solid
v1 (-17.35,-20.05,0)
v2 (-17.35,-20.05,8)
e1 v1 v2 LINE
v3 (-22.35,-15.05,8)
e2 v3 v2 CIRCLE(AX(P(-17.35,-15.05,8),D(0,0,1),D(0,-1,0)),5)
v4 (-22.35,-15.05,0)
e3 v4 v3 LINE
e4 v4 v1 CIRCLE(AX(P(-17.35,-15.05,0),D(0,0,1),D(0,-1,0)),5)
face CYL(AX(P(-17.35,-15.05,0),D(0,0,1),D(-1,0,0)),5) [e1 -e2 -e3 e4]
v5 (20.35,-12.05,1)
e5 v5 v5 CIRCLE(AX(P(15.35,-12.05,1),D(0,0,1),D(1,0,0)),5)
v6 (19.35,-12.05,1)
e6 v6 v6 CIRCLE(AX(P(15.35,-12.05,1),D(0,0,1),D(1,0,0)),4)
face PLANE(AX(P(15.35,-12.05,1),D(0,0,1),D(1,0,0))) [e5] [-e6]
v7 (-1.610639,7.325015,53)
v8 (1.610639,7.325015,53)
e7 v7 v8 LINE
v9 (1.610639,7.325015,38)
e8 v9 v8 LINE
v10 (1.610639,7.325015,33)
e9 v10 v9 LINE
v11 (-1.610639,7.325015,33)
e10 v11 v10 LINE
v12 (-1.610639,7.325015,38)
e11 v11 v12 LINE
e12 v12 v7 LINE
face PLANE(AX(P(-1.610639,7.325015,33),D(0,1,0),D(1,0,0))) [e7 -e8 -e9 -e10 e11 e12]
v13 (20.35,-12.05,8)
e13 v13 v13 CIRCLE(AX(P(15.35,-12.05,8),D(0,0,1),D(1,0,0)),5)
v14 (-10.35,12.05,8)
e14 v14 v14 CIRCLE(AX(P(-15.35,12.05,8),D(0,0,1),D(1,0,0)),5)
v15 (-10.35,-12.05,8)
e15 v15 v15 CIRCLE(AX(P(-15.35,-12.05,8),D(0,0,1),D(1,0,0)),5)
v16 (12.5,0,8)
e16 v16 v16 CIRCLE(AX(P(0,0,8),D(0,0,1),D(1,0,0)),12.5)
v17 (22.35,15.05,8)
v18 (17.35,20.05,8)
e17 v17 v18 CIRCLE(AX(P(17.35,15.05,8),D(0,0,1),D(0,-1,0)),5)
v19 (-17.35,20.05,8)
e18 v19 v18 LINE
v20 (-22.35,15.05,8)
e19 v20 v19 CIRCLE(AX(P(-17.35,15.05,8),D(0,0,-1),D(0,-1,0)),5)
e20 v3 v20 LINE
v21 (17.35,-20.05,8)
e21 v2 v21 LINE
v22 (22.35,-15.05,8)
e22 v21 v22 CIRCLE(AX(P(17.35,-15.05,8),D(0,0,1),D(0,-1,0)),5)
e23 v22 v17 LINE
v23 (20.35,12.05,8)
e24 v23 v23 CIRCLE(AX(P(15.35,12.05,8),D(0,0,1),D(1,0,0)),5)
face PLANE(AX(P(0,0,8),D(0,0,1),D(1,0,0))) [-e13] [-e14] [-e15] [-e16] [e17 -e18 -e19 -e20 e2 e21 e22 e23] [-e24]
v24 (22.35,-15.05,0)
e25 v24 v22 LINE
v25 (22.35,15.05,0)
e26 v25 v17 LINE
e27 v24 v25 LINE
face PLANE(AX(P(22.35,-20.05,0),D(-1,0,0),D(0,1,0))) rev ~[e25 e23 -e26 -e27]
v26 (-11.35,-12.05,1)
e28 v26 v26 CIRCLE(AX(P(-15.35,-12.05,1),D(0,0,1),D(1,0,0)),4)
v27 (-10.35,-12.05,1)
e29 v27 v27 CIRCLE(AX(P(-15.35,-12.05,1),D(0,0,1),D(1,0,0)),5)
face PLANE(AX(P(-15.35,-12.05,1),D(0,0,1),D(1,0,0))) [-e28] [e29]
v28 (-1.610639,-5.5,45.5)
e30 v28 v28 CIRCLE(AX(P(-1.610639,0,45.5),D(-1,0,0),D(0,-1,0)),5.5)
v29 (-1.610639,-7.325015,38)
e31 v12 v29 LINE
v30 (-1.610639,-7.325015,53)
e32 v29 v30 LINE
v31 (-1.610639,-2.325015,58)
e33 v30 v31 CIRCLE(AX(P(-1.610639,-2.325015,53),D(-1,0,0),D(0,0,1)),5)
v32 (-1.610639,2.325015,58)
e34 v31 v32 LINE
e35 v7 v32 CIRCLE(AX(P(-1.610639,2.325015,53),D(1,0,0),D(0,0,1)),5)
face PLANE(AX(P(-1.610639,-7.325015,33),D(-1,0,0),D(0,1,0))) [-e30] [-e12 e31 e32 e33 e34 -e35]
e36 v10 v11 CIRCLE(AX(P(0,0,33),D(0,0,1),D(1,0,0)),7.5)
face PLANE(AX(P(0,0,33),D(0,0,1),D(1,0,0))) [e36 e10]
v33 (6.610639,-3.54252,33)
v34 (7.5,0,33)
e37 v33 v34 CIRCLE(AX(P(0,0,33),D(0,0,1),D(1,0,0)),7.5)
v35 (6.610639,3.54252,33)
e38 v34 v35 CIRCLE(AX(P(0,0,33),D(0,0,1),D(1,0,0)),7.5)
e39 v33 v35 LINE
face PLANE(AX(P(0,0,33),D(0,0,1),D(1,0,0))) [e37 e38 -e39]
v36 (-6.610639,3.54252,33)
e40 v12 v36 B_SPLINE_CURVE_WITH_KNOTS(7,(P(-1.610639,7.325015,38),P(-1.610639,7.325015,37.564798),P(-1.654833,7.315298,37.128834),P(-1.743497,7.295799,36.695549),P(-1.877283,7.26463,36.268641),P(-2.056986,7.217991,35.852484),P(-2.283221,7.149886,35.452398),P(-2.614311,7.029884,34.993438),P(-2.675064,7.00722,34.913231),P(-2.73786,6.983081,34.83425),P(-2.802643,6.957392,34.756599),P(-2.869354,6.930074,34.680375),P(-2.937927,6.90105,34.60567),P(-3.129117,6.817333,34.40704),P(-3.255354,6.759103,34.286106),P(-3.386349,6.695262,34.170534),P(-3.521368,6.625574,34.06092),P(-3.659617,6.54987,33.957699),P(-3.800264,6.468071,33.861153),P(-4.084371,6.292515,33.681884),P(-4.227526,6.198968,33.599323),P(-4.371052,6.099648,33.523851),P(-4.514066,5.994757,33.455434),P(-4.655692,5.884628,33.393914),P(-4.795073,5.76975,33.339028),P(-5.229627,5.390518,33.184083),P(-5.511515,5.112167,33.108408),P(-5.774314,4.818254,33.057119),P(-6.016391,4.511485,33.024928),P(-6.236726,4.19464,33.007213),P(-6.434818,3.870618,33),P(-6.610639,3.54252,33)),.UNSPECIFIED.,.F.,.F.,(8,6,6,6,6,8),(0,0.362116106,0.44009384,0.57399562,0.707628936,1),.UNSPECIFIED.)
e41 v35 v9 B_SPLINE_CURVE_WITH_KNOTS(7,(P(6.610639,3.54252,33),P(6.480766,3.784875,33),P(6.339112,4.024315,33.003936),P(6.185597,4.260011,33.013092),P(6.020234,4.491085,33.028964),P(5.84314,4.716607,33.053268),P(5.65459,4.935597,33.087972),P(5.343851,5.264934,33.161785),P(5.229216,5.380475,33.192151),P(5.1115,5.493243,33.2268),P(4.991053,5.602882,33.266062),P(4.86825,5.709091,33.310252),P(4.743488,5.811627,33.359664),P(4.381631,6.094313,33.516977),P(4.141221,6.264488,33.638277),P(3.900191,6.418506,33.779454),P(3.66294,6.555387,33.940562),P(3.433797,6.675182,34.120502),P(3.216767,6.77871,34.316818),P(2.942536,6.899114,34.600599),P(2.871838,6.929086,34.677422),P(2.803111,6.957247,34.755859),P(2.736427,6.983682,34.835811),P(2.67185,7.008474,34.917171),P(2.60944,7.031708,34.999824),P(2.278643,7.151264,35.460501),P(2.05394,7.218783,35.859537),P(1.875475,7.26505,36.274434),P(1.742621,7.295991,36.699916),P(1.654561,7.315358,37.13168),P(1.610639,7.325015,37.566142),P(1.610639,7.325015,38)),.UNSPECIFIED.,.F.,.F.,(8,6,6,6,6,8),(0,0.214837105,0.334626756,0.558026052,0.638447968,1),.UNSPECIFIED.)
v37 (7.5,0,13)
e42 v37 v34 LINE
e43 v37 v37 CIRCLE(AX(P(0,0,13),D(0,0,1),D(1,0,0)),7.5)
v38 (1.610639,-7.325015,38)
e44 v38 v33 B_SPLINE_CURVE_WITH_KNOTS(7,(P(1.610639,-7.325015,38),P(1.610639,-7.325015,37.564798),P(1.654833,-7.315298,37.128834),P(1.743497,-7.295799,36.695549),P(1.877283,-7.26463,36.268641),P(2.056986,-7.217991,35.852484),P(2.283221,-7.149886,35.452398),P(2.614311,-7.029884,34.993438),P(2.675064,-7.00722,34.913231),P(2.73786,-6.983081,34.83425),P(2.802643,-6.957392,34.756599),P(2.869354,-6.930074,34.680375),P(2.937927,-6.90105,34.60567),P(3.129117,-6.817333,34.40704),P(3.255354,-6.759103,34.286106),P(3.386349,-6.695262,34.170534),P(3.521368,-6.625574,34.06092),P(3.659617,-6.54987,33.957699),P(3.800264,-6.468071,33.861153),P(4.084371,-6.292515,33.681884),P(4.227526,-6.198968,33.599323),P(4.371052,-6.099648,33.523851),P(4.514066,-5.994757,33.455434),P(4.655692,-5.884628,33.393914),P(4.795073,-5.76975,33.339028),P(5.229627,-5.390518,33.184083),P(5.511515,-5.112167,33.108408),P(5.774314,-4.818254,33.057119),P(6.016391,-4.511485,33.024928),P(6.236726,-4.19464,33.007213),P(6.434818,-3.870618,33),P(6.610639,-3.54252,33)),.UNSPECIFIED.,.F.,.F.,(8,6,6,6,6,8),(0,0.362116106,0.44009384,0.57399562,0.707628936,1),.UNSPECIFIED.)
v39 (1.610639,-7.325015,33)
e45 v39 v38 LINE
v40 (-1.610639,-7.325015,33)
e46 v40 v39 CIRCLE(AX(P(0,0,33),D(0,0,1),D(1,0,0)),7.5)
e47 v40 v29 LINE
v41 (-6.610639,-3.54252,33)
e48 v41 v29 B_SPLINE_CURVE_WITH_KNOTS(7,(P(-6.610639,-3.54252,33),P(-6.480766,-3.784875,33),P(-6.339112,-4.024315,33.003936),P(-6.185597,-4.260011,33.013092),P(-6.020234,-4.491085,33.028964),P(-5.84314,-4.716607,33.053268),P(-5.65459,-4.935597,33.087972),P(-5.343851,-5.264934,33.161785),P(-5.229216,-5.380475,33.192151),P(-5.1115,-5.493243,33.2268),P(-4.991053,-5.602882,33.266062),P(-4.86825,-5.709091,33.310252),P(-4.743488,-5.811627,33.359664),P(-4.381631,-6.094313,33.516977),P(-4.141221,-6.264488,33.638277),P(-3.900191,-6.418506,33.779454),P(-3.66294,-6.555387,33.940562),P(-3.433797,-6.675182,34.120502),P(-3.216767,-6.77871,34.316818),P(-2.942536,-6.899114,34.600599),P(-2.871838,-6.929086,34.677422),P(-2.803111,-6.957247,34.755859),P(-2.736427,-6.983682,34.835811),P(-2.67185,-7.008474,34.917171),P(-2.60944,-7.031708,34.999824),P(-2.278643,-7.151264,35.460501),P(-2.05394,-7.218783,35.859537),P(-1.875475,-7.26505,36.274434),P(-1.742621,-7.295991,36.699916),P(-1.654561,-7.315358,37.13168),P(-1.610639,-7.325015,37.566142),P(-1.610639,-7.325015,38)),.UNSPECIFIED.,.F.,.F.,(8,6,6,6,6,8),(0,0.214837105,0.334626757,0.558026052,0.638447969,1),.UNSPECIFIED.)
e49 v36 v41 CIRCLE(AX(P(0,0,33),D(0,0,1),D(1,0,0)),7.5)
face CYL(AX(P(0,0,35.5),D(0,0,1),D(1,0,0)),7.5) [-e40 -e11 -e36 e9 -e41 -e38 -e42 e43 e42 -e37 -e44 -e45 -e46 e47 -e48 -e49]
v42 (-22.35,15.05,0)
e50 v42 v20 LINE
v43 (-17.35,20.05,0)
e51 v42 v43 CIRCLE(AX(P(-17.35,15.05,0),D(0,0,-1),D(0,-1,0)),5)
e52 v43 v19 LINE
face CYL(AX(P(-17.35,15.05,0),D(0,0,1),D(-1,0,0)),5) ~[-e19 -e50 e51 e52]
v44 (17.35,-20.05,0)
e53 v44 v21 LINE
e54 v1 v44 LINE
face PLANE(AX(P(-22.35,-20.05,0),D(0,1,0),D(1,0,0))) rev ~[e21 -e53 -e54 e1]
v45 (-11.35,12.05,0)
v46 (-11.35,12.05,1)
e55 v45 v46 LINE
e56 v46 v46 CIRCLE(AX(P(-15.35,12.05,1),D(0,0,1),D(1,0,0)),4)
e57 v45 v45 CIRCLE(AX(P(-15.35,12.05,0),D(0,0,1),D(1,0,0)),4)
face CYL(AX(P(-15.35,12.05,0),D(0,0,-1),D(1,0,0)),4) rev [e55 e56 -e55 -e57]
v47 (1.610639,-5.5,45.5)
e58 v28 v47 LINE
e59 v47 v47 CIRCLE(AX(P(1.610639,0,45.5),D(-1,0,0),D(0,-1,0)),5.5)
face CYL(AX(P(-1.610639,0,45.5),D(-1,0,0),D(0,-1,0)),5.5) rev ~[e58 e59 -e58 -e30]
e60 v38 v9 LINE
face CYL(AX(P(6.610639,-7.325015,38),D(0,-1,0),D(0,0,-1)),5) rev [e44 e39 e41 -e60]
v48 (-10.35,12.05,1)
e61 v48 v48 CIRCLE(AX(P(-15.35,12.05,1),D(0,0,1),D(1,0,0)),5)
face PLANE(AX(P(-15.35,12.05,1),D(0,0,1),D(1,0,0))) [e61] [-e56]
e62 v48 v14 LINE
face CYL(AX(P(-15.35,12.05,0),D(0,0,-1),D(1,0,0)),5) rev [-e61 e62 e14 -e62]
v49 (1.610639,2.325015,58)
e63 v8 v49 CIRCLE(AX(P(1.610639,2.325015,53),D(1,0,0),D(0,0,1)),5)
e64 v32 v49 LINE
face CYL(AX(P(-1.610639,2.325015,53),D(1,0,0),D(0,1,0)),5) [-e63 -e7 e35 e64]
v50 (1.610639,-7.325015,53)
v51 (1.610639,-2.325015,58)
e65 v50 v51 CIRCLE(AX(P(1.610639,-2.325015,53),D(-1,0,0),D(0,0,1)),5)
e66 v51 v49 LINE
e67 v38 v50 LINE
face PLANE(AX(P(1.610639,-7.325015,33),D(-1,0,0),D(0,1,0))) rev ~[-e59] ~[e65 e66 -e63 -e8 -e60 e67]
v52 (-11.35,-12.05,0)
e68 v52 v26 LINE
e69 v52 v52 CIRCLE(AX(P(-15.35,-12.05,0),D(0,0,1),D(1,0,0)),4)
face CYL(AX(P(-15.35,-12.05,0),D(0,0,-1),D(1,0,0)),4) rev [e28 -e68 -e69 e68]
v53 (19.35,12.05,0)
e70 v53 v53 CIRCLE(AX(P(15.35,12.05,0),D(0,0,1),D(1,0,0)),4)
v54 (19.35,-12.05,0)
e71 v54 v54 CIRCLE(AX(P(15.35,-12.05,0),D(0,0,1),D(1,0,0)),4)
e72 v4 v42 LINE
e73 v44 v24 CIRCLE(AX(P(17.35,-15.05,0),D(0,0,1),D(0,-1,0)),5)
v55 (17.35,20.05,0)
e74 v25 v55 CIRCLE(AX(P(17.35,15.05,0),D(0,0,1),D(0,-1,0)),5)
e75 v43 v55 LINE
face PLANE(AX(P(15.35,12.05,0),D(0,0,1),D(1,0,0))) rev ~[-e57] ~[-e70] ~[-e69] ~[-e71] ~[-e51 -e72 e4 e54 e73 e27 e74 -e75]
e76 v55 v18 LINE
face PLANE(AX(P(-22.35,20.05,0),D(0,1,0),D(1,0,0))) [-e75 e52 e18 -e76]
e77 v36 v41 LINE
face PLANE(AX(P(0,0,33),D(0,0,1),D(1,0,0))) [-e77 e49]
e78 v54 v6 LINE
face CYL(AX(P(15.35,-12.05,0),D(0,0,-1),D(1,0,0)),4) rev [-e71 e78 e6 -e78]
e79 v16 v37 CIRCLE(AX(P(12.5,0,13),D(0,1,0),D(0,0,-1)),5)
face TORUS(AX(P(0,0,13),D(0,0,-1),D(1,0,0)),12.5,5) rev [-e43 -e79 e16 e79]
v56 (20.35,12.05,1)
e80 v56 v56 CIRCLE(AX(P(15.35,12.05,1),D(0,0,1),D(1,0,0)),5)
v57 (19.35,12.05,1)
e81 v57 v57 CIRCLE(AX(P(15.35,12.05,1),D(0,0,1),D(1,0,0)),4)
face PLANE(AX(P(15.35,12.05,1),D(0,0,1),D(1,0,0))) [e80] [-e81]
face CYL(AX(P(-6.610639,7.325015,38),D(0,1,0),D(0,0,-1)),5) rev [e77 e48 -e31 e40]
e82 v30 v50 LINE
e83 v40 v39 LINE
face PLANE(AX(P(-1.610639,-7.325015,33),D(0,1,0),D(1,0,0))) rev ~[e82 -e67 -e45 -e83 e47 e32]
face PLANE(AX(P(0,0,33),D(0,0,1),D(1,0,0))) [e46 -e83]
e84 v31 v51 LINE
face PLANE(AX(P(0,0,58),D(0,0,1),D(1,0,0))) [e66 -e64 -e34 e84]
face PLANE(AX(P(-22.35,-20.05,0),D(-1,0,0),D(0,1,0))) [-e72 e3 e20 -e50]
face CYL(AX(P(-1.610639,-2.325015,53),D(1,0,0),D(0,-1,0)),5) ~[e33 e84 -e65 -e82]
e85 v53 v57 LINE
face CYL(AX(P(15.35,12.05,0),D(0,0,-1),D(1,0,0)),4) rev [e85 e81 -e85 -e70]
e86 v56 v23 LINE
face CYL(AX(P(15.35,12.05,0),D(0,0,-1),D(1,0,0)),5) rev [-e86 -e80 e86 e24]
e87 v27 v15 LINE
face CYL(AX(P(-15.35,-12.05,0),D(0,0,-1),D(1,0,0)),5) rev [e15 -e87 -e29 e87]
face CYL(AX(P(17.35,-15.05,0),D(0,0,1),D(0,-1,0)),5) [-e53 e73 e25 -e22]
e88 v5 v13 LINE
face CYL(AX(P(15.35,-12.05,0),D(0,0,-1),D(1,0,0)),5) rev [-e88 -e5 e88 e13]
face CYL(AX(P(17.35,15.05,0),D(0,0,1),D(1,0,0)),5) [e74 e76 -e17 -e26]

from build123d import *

# Parameters (mm, degrees)
F0_W          = 44.7
F0_H          = 40.1
F0_R          = 5
F1_DEPTH      = 8
F0_R_2        = 4
F2_DEPTH      = 1
F3_R          = 7.5
F4_DEPTH      = 25
F5_W          = 3.2212789527
F5_H          = 14.6500294167
F6_DEPTH      = 25
F7_R          = 5.5
F8_DEPTH      = 10
F9_R          = 5
F10_T4_DEPTH  = 14.6500294167
F10_S5_R      = 7.5
F10_T6_DEPTH  = 10
F10_T10_DEPTH = 14.6500294167
F10_S11_R     = 7.5
F10_T12_DEPTH = 10


# Not quite as in the source:
# - a fillet or chamfer that OpenCascade refuses, or shapes differently, is made with other operations: its cross-section is extruded or revolved along the edge and cut away or added


with BuildPart() as f1:
    # F0 (on Top) → F1 (new body)
    with BuildSketch(Plane.XY):
        Rectangle(F0_W, F0_H)
        with Locations((-15.35, -12.05)):
            Circle(F0_R, mode=Mode.SUBTRACT)
        with Locations((15.35, -12.05)):
            Circle(F0_R, mode=Mode.SUBTRACT)
        with Locations((-15.35, 12.05)):
            Circle(F0_R, mode=Mode.SUBTRACT)
        with Locations((15.35, 12.05)):
            Circle(F0_R, mode=Mode.SUBTRACT)
    extrude(amount=F1_DEPTH)

    # F0 (on Top) → F2 (join)
    with BuildSketch(Plane.XY):
        with Locations((15.35, 12.05)):
            Circle(F0_R)
        with Locations((15.35, 12.05)):
            Circle(F0_R_2, mode=Mode.SUBTRACT)
        with Locations((15.35, -12.05)):
            Circle(F0_R)
        with Locations((15.35, -12.05)):
            Circle(F0_R_2, mode=Mode.SUBTRACT)
        with Locations((-15.35, -12.05)):
            Circle(F0_R)
        with Locations((-15.35, -12.05)):
            Circle(F0_R_2, mode=Mode.SUBTRACT)
        with Locations((-15.35, 12.05)):
            Circle(F0_R)
        with Locations((-15.35, 12.05)):
            Circle(F0_R_2, mode=Mode.SUBTRACT)
    extrude(amount=F2_DEPTH)

    # F3 (on face) → F4 (join)
    with BuildSketch(Plane.XY.offset(8)):
        Circle(F3_R)
    extrude(amount=F4_DEPTH)

    # F5 (on face) → F6 (join)
    with BuildSketch(Plane.XY.offset(33)):
        Rectangle(F5_W, F5_H)
    extrude(amount=F6_DEPTH)

    # F7 (on face) → F8 (cut)
    with BuildSketch(Plane(origin=(-1.6106394764, 0, 0), x_dir=(0, -1, 0), z_dir=(-1, 0, 0))):
        with Locations((0, 45.5)):
            Circle(F7_R)
    extrude(amount=-F8_DEPTH, mode=Mode.SUBTRACT)

    # F9
    f9_edges = [f1.edges().sort_by_distance(p)[0] for p in [
        (0, 7.325015, 58),
        (0, -7.325015, 58),
        (-22.35, 20.05, 4),
        (-22.35, -20.05, 4),
        (22.35, -20.05, 4),
        (22.35, 20.05, 4),
    ]]
    fillet(f9_edges, radius=F9_R)

    # F10: fillet of radius 5 on 3 edges, made by hand


with BuildPart() as f10_tool2:
    # F10_s3 → F10_t4 (new body)
    with BuildSketch(Plane.XZ.offset(7.3250147083)):
        with BuildLine():
            ThreePointArc((6.6106394764, 33), (3.0751055704, 34.4644660941), (1.6106394764, 38))
            Line((1.6106394764, 38), (1.6106394764, 33))
            Line((1.6106394764, 33), (6.6106394764, 33))
        make_face()
    extrude(amount=-F10_T4_DEPTH)

    # F10_s5 → F10_t6 (intersect, symmetric)
    with BuildSketch(Plane.XY.offset(35.5)):
        Circle(F10_S5_R)
    extrude(amount=F10_T6_DEPTH, both=True, mode=Mode.INTERSECT)


with BuildPart() as f1_1:
    add(f1.part)

    # F10_t1: union F10_tool2
    add(f10_tool2.part)


with BuildPart() as f10_tool8:
    # F10_s9 → F10_t10 (new body)
    with BuildSketch(Plane.XZ.offset(-7.3250147083)):
        with BuildLine():
            ThreePointArc((-6.6106394764, 33), (-3.0751055704, 34.4644660941), (-1.6106394764, 38))
            Line((-1.6106394764, 38), (-1.6106394764, 33))
            Line((-1.6106394764, 33), (-6.6106394764, 33))
        make_face()
    extrude(amount=F10_T10_DEPTH)

    # F10_s11 → F10_t12 (intersect, symmetric)
    with BuildSketch(Plane.XY.offset(35.5)):
        Circle(F10_S11_R)
    extrude(amount=F10_T12_DEPTH, both=True, mode=Mode.INTERSECT)


with BuildPart() as f1_2:
    add(f1_1.part)

    # F10_t7: union F10_tool8
    add(f10_tool8.part)

    # F10_s13 → F10_t14 (revolve)
    with BuildSketch(Plane.XZ):
        with BuildLine():
            ThreePointArc((12.5, 8), (8.9644660941, 9.4644660941), (7.5, 13))
            Line((7.5, 13), (7.5, 8))
            Line((7.5, 8), (12.5, 8))
        make_face()
    revolve(axis=Axis((0, 0, 8), (0, 0, 1)))


solid = f1_2.part
